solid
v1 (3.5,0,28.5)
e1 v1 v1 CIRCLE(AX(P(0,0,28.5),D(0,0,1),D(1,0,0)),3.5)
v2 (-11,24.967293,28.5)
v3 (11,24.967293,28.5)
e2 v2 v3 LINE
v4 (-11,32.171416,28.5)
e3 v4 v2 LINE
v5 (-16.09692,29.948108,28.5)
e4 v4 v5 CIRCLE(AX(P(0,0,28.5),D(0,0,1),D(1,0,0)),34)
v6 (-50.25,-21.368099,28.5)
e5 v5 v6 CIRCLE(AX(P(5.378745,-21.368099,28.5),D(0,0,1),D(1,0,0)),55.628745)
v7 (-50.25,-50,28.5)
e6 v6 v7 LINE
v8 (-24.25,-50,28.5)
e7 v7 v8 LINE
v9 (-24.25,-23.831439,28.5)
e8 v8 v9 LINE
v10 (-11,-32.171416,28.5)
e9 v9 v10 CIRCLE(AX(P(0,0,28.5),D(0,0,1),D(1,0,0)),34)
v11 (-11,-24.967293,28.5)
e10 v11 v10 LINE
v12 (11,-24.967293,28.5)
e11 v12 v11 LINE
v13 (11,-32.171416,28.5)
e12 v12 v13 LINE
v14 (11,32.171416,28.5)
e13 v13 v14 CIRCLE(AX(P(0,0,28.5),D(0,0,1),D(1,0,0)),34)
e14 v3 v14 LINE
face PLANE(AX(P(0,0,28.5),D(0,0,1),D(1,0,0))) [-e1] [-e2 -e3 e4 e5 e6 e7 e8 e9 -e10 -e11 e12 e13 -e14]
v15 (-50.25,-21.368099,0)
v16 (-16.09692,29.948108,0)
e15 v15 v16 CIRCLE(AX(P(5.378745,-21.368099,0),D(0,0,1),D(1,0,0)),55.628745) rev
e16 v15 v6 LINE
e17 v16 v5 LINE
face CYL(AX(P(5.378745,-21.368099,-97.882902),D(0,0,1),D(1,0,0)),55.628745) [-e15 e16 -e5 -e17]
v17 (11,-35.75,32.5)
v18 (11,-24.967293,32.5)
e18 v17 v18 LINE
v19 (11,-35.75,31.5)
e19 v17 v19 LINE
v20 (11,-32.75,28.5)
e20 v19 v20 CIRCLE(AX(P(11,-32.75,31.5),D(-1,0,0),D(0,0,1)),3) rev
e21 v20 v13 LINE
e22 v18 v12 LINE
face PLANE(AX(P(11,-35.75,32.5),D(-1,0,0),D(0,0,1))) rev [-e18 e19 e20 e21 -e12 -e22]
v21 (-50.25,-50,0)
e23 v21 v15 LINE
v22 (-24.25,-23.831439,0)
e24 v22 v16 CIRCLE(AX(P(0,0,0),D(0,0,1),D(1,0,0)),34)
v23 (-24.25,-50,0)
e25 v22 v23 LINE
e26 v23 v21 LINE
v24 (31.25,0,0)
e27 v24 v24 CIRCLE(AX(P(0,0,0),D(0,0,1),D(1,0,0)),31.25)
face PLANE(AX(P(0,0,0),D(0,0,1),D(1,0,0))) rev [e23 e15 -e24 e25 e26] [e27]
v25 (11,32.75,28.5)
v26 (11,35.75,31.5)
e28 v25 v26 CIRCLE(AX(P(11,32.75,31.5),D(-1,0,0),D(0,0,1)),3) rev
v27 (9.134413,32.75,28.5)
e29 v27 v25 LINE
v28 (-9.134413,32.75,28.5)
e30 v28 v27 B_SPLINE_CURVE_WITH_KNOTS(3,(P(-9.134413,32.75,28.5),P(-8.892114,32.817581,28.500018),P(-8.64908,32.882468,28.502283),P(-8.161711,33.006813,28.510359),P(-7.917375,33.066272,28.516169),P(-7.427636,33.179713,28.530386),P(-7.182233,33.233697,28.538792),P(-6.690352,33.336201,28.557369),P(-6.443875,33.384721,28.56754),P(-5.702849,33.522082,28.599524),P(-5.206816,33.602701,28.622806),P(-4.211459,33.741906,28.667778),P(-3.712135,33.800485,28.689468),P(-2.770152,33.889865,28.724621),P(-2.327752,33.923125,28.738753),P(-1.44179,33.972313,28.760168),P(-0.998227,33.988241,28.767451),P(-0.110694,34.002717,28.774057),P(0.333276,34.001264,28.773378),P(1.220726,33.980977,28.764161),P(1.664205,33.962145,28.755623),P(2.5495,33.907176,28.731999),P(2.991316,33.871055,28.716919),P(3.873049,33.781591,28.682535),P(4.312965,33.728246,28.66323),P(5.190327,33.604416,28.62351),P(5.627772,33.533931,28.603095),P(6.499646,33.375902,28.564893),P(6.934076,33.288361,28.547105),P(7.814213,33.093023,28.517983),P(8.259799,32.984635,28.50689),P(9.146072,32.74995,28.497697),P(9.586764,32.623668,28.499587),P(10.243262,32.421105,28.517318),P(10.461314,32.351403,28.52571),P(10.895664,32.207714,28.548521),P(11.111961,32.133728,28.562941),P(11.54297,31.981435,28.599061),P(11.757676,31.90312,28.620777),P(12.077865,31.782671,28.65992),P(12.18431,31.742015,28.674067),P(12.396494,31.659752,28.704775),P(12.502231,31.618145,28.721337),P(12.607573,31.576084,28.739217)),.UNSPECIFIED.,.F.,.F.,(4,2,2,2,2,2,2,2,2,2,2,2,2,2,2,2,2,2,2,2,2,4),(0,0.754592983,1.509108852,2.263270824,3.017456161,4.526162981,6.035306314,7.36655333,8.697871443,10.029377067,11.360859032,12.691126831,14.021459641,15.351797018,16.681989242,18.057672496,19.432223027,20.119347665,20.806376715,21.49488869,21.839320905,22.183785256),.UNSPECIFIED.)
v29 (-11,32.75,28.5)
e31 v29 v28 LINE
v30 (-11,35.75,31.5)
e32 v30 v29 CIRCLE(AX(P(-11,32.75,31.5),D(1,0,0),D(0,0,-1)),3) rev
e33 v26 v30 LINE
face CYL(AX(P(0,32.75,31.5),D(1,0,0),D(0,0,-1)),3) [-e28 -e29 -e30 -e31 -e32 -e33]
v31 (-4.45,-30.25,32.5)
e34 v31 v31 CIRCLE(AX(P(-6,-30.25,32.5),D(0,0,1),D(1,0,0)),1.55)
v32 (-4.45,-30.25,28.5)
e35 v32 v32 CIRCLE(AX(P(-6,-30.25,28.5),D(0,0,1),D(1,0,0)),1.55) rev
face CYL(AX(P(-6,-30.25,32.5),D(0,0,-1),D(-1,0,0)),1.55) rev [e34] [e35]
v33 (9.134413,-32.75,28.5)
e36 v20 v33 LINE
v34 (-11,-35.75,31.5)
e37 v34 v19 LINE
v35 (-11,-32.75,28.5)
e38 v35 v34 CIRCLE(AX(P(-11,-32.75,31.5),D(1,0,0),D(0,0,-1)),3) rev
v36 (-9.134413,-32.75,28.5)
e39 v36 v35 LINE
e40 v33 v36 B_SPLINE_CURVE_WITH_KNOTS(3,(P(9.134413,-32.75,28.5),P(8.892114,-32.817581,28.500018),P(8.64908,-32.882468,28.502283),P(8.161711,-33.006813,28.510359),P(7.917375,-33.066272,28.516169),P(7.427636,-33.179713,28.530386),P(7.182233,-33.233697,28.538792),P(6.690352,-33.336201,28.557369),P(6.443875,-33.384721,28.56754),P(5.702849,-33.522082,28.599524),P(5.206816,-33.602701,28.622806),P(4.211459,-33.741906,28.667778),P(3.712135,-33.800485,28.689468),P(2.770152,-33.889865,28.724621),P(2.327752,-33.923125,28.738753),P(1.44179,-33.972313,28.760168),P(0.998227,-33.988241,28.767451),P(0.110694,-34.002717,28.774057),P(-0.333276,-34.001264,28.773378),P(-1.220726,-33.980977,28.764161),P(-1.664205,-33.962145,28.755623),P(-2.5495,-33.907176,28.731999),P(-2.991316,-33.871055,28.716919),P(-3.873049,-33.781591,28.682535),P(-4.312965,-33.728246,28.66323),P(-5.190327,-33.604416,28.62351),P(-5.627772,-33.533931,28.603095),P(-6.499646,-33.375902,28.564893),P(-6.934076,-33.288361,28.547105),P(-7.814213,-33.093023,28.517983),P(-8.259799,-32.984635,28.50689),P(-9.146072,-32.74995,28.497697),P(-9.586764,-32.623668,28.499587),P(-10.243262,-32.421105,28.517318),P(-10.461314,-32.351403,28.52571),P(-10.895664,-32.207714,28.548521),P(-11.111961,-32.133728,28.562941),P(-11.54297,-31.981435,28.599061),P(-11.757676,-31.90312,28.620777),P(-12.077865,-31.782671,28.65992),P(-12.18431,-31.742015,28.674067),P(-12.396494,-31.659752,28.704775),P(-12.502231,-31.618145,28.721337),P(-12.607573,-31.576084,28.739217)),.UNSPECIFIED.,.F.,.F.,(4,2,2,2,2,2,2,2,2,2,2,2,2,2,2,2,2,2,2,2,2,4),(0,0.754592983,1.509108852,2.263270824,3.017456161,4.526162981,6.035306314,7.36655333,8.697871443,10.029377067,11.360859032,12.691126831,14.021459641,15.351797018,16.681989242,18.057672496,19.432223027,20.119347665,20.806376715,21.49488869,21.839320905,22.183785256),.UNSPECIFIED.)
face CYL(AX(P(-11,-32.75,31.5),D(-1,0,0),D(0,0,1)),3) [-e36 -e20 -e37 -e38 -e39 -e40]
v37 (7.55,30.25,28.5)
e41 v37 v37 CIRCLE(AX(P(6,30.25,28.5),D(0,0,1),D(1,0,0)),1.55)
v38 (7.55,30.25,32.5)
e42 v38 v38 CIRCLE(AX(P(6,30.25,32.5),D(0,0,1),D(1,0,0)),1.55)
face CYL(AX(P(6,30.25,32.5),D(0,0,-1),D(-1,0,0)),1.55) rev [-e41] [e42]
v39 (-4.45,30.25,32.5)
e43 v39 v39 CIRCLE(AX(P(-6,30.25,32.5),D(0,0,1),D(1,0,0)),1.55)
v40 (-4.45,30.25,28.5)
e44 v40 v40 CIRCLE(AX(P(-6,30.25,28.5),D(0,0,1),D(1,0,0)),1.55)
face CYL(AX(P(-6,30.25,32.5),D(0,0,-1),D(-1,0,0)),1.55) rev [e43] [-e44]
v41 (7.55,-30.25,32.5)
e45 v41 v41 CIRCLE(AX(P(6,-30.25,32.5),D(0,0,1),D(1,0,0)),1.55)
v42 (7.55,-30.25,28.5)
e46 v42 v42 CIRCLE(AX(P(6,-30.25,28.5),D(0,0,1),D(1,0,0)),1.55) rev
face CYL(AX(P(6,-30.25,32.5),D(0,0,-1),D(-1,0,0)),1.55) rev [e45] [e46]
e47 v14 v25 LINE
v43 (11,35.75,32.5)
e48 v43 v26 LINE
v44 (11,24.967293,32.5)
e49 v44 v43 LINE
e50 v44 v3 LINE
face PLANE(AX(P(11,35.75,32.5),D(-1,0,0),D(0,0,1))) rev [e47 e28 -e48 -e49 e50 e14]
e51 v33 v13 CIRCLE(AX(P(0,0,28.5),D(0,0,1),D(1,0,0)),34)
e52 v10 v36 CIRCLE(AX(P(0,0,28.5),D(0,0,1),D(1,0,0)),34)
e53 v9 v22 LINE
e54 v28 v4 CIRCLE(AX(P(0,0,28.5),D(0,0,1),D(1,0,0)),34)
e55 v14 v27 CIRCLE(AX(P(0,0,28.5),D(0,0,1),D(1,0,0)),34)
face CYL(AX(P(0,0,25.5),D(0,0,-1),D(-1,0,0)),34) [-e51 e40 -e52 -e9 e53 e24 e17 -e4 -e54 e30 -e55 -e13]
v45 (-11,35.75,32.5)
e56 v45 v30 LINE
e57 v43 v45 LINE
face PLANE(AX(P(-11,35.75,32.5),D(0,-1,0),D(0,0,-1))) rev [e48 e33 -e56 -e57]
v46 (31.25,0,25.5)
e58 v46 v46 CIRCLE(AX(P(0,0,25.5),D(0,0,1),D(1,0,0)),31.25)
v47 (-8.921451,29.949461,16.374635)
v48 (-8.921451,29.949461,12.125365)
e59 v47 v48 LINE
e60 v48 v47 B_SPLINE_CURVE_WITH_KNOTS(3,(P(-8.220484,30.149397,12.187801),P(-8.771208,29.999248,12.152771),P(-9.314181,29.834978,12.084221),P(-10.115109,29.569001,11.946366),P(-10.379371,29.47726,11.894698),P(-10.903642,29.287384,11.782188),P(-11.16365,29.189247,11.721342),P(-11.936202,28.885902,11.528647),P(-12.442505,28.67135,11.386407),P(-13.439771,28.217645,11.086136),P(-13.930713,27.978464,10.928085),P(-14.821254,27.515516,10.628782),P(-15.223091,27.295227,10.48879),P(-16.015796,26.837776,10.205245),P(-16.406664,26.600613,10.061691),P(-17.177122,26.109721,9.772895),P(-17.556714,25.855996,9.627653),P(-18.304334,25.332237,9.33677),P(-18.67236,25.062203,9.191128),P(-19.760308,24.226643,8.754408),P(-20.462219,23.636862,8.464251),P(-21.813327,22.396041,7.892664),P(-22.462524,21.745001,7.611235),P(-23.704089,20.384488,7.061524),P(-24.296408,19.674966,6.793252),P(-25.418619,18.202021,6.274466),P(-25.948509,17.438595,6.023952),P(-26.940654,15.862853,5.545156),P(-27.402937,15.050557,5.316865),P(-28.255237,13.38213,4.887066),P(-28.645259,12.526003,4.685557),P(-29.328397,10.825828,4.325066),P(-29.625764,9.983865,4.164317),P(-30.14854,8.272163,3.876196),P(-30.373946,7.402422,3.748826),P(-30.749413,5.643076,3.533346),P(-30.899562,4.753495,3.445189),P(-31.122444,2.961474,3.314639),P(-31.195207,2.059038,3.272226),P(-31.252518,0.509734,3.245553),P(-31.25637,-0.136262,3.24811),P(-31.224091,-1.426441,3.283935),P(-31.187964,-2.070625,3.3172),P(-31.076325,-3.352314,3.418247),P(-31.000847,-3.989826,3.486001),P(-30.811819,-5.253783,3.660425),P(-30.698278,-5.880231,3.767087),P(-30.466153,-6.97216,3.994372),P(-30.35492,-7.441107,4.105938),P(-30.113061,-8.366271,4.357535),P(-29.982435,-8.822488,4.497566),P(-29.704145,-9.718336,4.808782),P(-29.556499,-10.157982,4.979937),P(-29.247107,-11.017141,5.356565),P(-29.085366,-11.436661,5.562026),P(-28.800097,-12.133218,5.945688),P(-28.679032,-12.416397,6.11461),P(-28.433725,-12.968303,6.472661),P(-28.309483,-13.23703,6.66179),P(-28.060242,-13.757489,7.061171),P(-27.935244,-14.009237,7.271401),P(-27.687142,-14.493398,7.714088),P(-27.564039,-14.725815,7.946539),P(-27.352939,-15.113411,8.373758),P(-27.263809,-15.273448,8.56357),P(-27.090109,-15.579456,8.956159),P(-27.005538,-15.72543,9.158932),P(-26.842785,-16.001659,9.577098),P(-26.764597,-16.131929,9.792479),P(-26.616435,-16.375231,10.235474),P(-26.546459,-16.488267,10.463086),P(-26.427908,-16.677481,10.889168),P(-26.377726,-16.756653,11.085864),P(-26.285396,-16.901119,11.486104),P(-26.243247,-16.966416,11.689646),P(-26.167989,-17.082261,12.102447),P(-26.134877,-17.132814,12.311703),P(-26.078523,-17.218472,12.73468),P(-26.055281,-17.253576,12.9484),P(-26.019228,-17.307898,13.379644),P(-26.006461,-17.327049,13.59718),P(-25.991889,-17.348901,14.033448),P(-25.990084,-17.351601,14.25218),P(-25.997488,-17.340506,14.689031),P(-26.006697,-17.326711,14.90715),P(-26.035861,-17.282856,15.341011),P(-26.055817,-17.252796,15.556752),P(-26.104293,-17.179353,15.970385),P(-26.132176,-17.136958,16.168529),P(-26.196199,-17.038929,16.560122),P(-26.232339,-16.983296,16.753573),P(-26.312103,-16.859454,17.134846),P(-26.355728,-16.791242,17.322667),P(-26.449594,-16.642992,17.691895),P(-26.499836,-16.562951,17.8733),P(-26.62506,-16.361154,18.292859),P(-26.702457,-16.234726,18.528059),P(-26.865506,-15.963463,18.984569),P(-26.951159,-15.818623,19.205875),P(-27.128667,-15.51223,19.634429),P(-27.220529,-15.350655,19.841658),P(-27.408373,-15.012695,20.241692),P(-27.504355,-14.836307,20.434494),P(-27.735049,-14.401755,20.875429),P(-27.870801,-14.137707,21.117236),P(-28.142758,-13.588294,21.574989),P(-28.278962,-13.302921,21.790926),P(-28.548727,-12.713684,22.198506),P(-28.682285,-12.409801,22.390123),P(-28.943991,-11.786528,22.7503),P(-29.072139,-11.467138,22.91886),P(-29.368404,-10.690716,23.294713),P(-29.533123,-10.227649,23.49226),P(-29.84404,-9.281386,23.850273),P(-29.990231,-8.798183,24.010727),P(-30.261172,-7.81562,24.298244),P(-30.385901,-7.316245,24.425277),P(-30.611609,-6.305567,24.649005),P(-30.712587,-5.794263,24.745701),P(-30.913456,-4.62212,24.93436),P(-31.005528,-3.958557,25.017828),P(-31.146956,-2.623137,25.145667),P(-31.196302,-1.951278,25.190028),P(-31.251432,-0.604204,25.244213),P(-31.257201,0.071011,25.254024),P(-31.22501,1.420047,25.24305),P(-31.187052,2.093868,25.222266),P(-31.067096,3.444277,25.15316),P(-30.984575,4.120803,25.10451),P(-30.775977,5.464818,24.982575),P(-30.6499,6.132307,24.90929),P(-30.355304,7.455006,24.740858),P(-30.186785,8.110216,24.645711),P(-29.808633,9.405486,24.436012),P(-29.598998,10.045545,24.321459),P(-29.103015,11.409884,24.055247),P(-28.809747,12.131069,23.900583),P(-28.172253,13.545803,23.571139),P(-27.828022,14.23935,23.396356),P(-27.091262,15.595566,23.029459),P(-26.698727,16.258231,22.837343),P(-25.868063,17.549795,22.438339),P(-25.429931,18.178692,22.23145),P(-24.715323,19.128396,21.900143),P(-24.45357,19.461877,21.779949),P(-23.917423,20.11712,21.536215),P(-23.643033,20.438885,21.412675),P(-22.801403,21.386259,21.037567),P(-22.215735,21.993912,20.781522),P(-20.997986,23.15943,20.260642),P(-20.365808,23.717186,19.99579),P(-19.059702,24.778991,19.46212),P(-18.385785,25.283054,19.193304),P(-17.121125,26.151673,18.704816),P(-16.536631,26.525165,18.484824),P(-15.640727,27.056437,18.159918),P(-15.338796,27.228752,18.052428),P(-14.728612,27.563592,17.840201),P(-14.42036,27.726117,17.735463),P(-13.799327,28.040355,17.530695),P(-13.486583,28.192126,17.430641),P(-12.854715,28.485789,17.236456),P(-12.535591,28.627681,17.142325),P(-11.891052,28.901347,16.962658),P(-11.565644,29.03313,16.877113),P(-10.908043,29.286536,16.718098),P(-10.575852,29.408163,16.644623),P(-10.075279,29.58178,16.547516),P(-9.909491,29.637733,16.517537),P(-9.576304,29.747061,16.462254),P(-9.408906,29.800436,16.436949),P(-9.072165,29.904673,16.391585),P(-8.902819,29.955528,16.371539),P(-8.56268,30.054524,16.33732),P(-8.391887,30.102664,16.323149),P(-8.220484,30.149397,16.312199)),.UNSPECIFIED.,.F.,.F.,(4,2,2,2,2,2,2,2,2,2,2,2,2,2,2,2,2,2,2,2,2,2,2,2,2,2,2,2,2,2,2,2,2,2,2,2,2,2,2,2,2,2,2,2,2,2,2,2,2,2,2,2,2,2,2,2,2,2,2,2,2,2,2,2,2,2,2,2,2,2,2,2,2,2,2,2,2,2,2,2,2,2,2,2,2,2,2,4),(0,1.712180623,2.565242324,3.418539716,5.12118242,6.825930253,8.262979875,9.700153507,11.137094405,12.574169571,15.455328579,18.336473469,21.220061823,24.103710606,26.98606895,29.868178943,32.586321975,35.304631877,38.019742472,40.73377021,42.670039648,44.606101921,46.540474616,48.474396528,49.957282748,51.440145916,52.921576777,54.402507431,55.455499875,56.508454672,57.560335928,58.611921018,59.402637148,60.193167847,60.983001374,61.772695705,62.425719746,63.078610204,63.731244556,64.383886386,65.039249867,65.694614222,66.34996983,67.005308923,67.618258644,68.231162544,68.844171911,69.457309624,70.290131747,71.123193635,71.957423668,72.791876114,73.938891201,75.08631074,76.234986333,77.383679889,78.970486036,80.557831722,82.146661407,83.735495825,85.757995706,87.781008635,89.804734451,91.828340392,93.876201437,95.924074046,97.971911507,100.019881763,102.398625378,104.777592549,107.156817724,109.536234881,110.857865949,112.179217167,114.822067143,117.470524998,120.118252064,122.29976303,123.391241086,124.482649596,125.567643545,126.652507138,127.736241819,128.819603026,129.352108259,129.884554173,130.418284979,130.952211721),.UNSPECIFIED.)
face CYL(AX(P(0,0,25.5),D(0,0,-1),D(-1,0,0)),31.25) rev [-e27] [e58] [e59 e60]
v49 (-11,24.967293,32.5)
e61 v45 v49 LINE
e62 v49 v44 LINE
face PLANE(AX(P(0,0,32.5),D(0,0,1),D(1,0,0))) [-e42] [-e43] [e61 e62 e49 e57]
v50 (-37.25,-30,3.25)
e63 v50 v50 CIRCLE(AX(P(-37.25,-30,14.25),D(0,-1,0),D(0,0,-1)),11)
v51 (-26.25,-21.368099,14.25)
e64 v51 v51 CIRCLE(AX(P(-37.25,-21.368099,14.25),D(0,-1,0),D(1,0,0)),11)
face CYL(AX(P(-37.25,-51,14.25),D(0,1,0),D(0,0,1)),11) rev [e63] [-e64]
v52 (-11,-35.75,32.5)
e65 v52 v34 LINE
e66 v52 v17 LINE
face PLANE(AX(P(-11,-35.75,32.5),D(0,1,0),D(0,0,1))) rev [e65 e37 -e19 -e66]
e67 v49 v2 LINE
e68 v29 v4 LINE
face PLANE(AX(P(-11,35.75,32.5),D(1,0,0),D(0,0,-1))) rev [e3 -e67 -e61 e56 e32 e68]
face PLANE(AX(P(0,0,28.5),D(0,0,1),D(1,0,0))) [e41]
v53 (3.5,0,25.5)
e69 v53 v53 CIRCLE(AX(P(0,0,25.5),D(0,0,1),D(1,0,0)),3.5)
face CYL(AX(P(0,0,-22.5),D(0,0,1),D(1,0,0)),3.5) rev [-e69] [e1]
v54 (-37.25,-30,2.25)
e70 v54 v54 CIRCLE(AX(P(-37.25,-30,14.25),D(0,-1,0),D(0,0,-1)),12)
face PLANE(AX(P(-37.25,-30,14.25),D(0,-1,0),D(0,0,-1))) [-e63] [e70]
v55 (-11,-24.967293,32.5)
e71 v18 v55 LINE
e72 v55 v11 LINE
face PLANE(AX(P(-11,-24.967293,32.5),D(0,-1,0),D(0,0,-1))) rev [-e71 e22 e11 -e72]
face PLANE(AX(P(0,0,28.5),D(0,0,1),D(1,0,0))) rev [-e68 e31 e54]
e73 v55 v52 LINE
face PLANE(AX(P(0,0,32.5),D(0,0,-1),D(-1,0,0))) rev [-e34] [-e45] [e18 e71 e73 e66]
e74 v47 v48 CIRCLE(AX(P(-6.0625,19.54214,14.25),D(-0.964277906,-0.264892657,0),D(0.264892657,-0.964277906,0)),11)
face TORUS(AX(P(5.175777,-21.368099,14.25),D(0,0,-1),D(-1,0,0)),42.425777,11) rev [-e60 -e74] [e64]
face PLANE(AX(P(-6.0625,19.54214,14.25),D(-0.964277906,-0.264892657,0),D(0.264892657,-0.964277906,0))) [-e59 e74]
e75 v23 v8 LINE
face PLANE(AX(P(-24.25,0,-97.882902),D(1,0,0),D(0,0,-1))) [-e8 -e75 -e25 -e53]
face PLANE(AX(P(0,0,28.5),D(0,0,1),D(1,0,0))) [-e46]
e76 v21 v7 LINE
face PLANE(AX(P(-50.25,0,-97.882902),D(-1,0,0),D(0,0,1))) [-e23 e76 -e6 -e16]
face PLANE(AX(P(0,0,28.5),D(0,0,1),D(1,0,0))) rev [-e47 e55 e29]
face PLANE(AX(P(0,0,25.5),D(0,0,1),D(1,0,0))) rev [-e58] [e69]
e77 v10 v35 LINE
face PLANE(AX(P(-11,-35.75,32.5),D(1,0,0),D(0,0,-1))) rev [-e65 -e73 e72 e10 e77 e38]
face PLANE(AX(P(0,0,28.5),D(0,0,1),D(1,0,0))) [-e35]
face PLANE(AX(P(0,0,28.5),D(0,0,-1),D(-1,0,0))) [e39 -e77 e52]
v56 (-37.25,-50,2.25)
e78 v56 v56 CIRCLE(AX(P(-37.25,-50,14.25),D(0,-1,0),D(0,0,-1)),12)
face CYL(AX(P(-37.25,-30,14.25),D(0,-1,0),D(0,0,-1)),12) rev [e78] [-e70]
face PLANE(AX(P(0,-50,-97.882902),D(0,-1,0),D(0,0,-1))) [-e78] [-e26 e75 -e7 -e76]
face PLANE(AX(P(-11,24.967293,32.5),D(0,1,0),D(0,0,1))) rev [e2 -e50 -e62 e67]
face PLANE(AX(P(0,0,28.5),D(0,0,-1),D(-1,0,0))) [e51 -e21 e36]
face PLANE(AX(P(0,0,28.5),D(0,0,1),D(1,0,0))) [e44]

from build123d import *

# Parameters (mm, degrees)
SKETCH1_R            = 34
SKETCH1_R_2          = 31.25
BOSS_EXTRUDE1_DEPTH  = 25.5
SKETCH2_R            = 34
BOSS_EXTRUDE2_DEPTH  = 3
SKETCH5_R            = 3.5
CUT_EXTRUDE3_DEPTH   = 51
BOSS_EXTRUDE9_START  = 25.5
BOSS_EXTRUDE9_DEPTH  = 28.5
CUT_SWEEP6_PROFILE_R = 11
SKETCH219_R          = 12
CUT_EXTRUDE10_DEPTH  = 20
SKETCH227_W          = 22
SKETCH227_H          = 10.782706647
SKETCH227_R          = 1.55
BOSS_EXTRUDE11_DEPTH = 4
FILLET1_R            = 3
FILLET2_R            = 3


with BuildPart() as part:
    # Sketch1 → Boss-Extrude1 (new body)
    with BuildSketch(Plane.XY):
        Circle(SKETCH1_R)
        Circle(SKETCH1_R_2, mode=Mode.SUBTRACT)
    extrude(amount=BOSS_EXTRUDE1_DEPTH)

    # Sketch2 → Boss-Extrude2 (add)
    with BuildSketch(Plane.XY.offset(25.5)):
        Circle(SKETCH2_R)
    extrude(amount=BOSS_EXTRUDE2_DEPTH)

    # Sketch5 → Cut-Extrude3 (cut)
    with BuildSketch(Plane.XY.offset(28.5)):
        Circle(SKETCH5_R)
    extrude(amount=-CUT_EXTRUDE3_DEPTH, mode=Mode.SUBTRACT)

    # Sketch3 → Boss-Extrude9 (add)
    with BuildSketch(Plane(origin=(0, 0, 25.5), x_dir=(-1, 0, 0), z_dir=(0, 0, -1)).offset(BOSS_EXTRUDE9_START)):
        with BuildLine():
            Line((24.25, -50), (50.25, -50))
            Line((50.25, -50), (50.25, -21.368098989))
            ThreePointArc((50.25, -21.368098989), (35.814519651, 16.017355688), (0, 34))
            Line((0, 34), (0, 31.25))
            ThreePointArc((0, 31.25), (28.21801379, 13.427814332), (24.25, -19.710403344))
            Line((24.25, -19.710403344), (24.25, -50))
        make_face()
    extrude(amount=-BOSS_EXTRUDE9_DEPTH)

    # Cut-Sweep6: sweep along a path in Sketch28
    with BuildLine(Plane(origin=(0, 0, 14.25), x_dir=(-1, 0, 0), z_dir=(0, 0, -1))) as cut_sweep6_path:
        Line((37.25, -50), (37.25, -21.368098989))
        ThreePointArc((37.25, -21.368098989), (28.563956157, 4.353039323), (6.0625, 19.54214017))
    # Cut-Sweep6 profile (on start of the path) → Cut-Sweep6 (sweep, cut)
    with BuildSketch(Plane(origin=(-37.25, -50, 14.25), x_dir=(0, 0, 1), z_dir=(0, 1, 0))):
        Circle(CUT_SWEEP6_PROFILE_R)
    sweep(path=cut_sweep6_path.line, mode=Mode.SUBTRACT)

    # Sketch219 → Cut-Extrude10 (cut)
    with BuildSketch(Plane.XZ.offset(50)):
        with Locations(Location((-37.25, 14.25, 0), (0, 0, 270))):
            Circle(SKETCH219_R)
    extrude(amount=-CUT_EXTRUDE10_DEPTH, mode=Mode.SUBTRACT)

    # Sketch227 → Boss-Extrude11 (add)
    # profile 1 of 2: a face of its own
    with BuildSketch(Plane.XY.offset(28.5)):
        with Locations((0, 30.358646677)):
            Rectangle(SKETCH227_W, SKETCH227_H)
        with Locations((-6, 30.25)):
            Circle(SKETCH227_R, mode=Mode.SUBTRACT)
        with Locations((6, 30.25)):
            Circle(SKETCH227_R, mode=Mode.SUBTRACT)
    # profile 2 of 2: a face of its own
    with BuildSketch(Plane.XY.offset(28.5)):
        with Locations((0, -30.358646677)):
            Rectangle(SKETCH227_W, SKETCH227_H)
        with Locations((-6, -30.25)):
            Circle(SKETCH227_R, mode=Mode.SUBTRACT)
        with Locations((6, -30.25)):
            Circle(SKETCH227_R, mode=Mode.SUBTRACT)
    extrude(amount=BOSS_EXTRUDE11_DEPTH)

    # Fillet1
    # the kernel refuses this fillet: 3 mm, written as the material it takes off along each edge
    with BuildSketch(Plane(origin=(-18.5, 35.75, 28.5), x_dir=(0, -1, 0), z_dir=(1, 0, 0))) as fillet1_piece_1_section:
        with BuildLine():
            CenterArc((FILLET1_R, -FILLET1_R), FILLET1_R, 90, 90)
            Line((0, -FILLET1_R), (0, 0))
            Line((0, 0), (FILLET1_R, 0))
        make_face()
    fillet1_piece_1 = extrude(amount=37, mode=Mode.PRIVATE)
    fillet1_piece_1 = fillet1_piece_1 - Plane(origin=(0, 0, 29.19390081), x_dir=(1, 0, 0), z_dir=(0, 0, -1)) * Cylinder(34, 86, mode=Mode.PRIVATE)
    add(fillet1_piece_1, mode=Mode.SUBTRACT)

    # Fillet2
    # the kernel refuses this fillet: 3 mm, written as the material it takes off along each edge
    with BuildSketch(Plane(origin=(-18.5, -35.75, 28.5), x_dir=(0, 1, 0), z_dir=(1, 0, 0))) as fillet2_piece_1_section:
        with BuildLine():
            CenterArc((FILLET2_R, FILLET2_R), FILLET2_R, 180, 90)
            Line((0, FILLET2_R), (0, 0))
            Line((0, 0), (FILLET2_R, 0))
        make_face()
    fillet2_piece_1 = extrude(amount=37, mode=Mode.PRIVATE)
    fillet2_piece_1 = fillet2_piece_1 - Plane(origin=(0, 0, 29.19390081), x_dir=(1, 0, 0), z_dir=(0, 0, -1)) * Cylinder(34, 86, mode=Mode.PRIVATE)
    add(fillet2_piece_1, mode=Mode.SUBTRACT)


solid = part.part
